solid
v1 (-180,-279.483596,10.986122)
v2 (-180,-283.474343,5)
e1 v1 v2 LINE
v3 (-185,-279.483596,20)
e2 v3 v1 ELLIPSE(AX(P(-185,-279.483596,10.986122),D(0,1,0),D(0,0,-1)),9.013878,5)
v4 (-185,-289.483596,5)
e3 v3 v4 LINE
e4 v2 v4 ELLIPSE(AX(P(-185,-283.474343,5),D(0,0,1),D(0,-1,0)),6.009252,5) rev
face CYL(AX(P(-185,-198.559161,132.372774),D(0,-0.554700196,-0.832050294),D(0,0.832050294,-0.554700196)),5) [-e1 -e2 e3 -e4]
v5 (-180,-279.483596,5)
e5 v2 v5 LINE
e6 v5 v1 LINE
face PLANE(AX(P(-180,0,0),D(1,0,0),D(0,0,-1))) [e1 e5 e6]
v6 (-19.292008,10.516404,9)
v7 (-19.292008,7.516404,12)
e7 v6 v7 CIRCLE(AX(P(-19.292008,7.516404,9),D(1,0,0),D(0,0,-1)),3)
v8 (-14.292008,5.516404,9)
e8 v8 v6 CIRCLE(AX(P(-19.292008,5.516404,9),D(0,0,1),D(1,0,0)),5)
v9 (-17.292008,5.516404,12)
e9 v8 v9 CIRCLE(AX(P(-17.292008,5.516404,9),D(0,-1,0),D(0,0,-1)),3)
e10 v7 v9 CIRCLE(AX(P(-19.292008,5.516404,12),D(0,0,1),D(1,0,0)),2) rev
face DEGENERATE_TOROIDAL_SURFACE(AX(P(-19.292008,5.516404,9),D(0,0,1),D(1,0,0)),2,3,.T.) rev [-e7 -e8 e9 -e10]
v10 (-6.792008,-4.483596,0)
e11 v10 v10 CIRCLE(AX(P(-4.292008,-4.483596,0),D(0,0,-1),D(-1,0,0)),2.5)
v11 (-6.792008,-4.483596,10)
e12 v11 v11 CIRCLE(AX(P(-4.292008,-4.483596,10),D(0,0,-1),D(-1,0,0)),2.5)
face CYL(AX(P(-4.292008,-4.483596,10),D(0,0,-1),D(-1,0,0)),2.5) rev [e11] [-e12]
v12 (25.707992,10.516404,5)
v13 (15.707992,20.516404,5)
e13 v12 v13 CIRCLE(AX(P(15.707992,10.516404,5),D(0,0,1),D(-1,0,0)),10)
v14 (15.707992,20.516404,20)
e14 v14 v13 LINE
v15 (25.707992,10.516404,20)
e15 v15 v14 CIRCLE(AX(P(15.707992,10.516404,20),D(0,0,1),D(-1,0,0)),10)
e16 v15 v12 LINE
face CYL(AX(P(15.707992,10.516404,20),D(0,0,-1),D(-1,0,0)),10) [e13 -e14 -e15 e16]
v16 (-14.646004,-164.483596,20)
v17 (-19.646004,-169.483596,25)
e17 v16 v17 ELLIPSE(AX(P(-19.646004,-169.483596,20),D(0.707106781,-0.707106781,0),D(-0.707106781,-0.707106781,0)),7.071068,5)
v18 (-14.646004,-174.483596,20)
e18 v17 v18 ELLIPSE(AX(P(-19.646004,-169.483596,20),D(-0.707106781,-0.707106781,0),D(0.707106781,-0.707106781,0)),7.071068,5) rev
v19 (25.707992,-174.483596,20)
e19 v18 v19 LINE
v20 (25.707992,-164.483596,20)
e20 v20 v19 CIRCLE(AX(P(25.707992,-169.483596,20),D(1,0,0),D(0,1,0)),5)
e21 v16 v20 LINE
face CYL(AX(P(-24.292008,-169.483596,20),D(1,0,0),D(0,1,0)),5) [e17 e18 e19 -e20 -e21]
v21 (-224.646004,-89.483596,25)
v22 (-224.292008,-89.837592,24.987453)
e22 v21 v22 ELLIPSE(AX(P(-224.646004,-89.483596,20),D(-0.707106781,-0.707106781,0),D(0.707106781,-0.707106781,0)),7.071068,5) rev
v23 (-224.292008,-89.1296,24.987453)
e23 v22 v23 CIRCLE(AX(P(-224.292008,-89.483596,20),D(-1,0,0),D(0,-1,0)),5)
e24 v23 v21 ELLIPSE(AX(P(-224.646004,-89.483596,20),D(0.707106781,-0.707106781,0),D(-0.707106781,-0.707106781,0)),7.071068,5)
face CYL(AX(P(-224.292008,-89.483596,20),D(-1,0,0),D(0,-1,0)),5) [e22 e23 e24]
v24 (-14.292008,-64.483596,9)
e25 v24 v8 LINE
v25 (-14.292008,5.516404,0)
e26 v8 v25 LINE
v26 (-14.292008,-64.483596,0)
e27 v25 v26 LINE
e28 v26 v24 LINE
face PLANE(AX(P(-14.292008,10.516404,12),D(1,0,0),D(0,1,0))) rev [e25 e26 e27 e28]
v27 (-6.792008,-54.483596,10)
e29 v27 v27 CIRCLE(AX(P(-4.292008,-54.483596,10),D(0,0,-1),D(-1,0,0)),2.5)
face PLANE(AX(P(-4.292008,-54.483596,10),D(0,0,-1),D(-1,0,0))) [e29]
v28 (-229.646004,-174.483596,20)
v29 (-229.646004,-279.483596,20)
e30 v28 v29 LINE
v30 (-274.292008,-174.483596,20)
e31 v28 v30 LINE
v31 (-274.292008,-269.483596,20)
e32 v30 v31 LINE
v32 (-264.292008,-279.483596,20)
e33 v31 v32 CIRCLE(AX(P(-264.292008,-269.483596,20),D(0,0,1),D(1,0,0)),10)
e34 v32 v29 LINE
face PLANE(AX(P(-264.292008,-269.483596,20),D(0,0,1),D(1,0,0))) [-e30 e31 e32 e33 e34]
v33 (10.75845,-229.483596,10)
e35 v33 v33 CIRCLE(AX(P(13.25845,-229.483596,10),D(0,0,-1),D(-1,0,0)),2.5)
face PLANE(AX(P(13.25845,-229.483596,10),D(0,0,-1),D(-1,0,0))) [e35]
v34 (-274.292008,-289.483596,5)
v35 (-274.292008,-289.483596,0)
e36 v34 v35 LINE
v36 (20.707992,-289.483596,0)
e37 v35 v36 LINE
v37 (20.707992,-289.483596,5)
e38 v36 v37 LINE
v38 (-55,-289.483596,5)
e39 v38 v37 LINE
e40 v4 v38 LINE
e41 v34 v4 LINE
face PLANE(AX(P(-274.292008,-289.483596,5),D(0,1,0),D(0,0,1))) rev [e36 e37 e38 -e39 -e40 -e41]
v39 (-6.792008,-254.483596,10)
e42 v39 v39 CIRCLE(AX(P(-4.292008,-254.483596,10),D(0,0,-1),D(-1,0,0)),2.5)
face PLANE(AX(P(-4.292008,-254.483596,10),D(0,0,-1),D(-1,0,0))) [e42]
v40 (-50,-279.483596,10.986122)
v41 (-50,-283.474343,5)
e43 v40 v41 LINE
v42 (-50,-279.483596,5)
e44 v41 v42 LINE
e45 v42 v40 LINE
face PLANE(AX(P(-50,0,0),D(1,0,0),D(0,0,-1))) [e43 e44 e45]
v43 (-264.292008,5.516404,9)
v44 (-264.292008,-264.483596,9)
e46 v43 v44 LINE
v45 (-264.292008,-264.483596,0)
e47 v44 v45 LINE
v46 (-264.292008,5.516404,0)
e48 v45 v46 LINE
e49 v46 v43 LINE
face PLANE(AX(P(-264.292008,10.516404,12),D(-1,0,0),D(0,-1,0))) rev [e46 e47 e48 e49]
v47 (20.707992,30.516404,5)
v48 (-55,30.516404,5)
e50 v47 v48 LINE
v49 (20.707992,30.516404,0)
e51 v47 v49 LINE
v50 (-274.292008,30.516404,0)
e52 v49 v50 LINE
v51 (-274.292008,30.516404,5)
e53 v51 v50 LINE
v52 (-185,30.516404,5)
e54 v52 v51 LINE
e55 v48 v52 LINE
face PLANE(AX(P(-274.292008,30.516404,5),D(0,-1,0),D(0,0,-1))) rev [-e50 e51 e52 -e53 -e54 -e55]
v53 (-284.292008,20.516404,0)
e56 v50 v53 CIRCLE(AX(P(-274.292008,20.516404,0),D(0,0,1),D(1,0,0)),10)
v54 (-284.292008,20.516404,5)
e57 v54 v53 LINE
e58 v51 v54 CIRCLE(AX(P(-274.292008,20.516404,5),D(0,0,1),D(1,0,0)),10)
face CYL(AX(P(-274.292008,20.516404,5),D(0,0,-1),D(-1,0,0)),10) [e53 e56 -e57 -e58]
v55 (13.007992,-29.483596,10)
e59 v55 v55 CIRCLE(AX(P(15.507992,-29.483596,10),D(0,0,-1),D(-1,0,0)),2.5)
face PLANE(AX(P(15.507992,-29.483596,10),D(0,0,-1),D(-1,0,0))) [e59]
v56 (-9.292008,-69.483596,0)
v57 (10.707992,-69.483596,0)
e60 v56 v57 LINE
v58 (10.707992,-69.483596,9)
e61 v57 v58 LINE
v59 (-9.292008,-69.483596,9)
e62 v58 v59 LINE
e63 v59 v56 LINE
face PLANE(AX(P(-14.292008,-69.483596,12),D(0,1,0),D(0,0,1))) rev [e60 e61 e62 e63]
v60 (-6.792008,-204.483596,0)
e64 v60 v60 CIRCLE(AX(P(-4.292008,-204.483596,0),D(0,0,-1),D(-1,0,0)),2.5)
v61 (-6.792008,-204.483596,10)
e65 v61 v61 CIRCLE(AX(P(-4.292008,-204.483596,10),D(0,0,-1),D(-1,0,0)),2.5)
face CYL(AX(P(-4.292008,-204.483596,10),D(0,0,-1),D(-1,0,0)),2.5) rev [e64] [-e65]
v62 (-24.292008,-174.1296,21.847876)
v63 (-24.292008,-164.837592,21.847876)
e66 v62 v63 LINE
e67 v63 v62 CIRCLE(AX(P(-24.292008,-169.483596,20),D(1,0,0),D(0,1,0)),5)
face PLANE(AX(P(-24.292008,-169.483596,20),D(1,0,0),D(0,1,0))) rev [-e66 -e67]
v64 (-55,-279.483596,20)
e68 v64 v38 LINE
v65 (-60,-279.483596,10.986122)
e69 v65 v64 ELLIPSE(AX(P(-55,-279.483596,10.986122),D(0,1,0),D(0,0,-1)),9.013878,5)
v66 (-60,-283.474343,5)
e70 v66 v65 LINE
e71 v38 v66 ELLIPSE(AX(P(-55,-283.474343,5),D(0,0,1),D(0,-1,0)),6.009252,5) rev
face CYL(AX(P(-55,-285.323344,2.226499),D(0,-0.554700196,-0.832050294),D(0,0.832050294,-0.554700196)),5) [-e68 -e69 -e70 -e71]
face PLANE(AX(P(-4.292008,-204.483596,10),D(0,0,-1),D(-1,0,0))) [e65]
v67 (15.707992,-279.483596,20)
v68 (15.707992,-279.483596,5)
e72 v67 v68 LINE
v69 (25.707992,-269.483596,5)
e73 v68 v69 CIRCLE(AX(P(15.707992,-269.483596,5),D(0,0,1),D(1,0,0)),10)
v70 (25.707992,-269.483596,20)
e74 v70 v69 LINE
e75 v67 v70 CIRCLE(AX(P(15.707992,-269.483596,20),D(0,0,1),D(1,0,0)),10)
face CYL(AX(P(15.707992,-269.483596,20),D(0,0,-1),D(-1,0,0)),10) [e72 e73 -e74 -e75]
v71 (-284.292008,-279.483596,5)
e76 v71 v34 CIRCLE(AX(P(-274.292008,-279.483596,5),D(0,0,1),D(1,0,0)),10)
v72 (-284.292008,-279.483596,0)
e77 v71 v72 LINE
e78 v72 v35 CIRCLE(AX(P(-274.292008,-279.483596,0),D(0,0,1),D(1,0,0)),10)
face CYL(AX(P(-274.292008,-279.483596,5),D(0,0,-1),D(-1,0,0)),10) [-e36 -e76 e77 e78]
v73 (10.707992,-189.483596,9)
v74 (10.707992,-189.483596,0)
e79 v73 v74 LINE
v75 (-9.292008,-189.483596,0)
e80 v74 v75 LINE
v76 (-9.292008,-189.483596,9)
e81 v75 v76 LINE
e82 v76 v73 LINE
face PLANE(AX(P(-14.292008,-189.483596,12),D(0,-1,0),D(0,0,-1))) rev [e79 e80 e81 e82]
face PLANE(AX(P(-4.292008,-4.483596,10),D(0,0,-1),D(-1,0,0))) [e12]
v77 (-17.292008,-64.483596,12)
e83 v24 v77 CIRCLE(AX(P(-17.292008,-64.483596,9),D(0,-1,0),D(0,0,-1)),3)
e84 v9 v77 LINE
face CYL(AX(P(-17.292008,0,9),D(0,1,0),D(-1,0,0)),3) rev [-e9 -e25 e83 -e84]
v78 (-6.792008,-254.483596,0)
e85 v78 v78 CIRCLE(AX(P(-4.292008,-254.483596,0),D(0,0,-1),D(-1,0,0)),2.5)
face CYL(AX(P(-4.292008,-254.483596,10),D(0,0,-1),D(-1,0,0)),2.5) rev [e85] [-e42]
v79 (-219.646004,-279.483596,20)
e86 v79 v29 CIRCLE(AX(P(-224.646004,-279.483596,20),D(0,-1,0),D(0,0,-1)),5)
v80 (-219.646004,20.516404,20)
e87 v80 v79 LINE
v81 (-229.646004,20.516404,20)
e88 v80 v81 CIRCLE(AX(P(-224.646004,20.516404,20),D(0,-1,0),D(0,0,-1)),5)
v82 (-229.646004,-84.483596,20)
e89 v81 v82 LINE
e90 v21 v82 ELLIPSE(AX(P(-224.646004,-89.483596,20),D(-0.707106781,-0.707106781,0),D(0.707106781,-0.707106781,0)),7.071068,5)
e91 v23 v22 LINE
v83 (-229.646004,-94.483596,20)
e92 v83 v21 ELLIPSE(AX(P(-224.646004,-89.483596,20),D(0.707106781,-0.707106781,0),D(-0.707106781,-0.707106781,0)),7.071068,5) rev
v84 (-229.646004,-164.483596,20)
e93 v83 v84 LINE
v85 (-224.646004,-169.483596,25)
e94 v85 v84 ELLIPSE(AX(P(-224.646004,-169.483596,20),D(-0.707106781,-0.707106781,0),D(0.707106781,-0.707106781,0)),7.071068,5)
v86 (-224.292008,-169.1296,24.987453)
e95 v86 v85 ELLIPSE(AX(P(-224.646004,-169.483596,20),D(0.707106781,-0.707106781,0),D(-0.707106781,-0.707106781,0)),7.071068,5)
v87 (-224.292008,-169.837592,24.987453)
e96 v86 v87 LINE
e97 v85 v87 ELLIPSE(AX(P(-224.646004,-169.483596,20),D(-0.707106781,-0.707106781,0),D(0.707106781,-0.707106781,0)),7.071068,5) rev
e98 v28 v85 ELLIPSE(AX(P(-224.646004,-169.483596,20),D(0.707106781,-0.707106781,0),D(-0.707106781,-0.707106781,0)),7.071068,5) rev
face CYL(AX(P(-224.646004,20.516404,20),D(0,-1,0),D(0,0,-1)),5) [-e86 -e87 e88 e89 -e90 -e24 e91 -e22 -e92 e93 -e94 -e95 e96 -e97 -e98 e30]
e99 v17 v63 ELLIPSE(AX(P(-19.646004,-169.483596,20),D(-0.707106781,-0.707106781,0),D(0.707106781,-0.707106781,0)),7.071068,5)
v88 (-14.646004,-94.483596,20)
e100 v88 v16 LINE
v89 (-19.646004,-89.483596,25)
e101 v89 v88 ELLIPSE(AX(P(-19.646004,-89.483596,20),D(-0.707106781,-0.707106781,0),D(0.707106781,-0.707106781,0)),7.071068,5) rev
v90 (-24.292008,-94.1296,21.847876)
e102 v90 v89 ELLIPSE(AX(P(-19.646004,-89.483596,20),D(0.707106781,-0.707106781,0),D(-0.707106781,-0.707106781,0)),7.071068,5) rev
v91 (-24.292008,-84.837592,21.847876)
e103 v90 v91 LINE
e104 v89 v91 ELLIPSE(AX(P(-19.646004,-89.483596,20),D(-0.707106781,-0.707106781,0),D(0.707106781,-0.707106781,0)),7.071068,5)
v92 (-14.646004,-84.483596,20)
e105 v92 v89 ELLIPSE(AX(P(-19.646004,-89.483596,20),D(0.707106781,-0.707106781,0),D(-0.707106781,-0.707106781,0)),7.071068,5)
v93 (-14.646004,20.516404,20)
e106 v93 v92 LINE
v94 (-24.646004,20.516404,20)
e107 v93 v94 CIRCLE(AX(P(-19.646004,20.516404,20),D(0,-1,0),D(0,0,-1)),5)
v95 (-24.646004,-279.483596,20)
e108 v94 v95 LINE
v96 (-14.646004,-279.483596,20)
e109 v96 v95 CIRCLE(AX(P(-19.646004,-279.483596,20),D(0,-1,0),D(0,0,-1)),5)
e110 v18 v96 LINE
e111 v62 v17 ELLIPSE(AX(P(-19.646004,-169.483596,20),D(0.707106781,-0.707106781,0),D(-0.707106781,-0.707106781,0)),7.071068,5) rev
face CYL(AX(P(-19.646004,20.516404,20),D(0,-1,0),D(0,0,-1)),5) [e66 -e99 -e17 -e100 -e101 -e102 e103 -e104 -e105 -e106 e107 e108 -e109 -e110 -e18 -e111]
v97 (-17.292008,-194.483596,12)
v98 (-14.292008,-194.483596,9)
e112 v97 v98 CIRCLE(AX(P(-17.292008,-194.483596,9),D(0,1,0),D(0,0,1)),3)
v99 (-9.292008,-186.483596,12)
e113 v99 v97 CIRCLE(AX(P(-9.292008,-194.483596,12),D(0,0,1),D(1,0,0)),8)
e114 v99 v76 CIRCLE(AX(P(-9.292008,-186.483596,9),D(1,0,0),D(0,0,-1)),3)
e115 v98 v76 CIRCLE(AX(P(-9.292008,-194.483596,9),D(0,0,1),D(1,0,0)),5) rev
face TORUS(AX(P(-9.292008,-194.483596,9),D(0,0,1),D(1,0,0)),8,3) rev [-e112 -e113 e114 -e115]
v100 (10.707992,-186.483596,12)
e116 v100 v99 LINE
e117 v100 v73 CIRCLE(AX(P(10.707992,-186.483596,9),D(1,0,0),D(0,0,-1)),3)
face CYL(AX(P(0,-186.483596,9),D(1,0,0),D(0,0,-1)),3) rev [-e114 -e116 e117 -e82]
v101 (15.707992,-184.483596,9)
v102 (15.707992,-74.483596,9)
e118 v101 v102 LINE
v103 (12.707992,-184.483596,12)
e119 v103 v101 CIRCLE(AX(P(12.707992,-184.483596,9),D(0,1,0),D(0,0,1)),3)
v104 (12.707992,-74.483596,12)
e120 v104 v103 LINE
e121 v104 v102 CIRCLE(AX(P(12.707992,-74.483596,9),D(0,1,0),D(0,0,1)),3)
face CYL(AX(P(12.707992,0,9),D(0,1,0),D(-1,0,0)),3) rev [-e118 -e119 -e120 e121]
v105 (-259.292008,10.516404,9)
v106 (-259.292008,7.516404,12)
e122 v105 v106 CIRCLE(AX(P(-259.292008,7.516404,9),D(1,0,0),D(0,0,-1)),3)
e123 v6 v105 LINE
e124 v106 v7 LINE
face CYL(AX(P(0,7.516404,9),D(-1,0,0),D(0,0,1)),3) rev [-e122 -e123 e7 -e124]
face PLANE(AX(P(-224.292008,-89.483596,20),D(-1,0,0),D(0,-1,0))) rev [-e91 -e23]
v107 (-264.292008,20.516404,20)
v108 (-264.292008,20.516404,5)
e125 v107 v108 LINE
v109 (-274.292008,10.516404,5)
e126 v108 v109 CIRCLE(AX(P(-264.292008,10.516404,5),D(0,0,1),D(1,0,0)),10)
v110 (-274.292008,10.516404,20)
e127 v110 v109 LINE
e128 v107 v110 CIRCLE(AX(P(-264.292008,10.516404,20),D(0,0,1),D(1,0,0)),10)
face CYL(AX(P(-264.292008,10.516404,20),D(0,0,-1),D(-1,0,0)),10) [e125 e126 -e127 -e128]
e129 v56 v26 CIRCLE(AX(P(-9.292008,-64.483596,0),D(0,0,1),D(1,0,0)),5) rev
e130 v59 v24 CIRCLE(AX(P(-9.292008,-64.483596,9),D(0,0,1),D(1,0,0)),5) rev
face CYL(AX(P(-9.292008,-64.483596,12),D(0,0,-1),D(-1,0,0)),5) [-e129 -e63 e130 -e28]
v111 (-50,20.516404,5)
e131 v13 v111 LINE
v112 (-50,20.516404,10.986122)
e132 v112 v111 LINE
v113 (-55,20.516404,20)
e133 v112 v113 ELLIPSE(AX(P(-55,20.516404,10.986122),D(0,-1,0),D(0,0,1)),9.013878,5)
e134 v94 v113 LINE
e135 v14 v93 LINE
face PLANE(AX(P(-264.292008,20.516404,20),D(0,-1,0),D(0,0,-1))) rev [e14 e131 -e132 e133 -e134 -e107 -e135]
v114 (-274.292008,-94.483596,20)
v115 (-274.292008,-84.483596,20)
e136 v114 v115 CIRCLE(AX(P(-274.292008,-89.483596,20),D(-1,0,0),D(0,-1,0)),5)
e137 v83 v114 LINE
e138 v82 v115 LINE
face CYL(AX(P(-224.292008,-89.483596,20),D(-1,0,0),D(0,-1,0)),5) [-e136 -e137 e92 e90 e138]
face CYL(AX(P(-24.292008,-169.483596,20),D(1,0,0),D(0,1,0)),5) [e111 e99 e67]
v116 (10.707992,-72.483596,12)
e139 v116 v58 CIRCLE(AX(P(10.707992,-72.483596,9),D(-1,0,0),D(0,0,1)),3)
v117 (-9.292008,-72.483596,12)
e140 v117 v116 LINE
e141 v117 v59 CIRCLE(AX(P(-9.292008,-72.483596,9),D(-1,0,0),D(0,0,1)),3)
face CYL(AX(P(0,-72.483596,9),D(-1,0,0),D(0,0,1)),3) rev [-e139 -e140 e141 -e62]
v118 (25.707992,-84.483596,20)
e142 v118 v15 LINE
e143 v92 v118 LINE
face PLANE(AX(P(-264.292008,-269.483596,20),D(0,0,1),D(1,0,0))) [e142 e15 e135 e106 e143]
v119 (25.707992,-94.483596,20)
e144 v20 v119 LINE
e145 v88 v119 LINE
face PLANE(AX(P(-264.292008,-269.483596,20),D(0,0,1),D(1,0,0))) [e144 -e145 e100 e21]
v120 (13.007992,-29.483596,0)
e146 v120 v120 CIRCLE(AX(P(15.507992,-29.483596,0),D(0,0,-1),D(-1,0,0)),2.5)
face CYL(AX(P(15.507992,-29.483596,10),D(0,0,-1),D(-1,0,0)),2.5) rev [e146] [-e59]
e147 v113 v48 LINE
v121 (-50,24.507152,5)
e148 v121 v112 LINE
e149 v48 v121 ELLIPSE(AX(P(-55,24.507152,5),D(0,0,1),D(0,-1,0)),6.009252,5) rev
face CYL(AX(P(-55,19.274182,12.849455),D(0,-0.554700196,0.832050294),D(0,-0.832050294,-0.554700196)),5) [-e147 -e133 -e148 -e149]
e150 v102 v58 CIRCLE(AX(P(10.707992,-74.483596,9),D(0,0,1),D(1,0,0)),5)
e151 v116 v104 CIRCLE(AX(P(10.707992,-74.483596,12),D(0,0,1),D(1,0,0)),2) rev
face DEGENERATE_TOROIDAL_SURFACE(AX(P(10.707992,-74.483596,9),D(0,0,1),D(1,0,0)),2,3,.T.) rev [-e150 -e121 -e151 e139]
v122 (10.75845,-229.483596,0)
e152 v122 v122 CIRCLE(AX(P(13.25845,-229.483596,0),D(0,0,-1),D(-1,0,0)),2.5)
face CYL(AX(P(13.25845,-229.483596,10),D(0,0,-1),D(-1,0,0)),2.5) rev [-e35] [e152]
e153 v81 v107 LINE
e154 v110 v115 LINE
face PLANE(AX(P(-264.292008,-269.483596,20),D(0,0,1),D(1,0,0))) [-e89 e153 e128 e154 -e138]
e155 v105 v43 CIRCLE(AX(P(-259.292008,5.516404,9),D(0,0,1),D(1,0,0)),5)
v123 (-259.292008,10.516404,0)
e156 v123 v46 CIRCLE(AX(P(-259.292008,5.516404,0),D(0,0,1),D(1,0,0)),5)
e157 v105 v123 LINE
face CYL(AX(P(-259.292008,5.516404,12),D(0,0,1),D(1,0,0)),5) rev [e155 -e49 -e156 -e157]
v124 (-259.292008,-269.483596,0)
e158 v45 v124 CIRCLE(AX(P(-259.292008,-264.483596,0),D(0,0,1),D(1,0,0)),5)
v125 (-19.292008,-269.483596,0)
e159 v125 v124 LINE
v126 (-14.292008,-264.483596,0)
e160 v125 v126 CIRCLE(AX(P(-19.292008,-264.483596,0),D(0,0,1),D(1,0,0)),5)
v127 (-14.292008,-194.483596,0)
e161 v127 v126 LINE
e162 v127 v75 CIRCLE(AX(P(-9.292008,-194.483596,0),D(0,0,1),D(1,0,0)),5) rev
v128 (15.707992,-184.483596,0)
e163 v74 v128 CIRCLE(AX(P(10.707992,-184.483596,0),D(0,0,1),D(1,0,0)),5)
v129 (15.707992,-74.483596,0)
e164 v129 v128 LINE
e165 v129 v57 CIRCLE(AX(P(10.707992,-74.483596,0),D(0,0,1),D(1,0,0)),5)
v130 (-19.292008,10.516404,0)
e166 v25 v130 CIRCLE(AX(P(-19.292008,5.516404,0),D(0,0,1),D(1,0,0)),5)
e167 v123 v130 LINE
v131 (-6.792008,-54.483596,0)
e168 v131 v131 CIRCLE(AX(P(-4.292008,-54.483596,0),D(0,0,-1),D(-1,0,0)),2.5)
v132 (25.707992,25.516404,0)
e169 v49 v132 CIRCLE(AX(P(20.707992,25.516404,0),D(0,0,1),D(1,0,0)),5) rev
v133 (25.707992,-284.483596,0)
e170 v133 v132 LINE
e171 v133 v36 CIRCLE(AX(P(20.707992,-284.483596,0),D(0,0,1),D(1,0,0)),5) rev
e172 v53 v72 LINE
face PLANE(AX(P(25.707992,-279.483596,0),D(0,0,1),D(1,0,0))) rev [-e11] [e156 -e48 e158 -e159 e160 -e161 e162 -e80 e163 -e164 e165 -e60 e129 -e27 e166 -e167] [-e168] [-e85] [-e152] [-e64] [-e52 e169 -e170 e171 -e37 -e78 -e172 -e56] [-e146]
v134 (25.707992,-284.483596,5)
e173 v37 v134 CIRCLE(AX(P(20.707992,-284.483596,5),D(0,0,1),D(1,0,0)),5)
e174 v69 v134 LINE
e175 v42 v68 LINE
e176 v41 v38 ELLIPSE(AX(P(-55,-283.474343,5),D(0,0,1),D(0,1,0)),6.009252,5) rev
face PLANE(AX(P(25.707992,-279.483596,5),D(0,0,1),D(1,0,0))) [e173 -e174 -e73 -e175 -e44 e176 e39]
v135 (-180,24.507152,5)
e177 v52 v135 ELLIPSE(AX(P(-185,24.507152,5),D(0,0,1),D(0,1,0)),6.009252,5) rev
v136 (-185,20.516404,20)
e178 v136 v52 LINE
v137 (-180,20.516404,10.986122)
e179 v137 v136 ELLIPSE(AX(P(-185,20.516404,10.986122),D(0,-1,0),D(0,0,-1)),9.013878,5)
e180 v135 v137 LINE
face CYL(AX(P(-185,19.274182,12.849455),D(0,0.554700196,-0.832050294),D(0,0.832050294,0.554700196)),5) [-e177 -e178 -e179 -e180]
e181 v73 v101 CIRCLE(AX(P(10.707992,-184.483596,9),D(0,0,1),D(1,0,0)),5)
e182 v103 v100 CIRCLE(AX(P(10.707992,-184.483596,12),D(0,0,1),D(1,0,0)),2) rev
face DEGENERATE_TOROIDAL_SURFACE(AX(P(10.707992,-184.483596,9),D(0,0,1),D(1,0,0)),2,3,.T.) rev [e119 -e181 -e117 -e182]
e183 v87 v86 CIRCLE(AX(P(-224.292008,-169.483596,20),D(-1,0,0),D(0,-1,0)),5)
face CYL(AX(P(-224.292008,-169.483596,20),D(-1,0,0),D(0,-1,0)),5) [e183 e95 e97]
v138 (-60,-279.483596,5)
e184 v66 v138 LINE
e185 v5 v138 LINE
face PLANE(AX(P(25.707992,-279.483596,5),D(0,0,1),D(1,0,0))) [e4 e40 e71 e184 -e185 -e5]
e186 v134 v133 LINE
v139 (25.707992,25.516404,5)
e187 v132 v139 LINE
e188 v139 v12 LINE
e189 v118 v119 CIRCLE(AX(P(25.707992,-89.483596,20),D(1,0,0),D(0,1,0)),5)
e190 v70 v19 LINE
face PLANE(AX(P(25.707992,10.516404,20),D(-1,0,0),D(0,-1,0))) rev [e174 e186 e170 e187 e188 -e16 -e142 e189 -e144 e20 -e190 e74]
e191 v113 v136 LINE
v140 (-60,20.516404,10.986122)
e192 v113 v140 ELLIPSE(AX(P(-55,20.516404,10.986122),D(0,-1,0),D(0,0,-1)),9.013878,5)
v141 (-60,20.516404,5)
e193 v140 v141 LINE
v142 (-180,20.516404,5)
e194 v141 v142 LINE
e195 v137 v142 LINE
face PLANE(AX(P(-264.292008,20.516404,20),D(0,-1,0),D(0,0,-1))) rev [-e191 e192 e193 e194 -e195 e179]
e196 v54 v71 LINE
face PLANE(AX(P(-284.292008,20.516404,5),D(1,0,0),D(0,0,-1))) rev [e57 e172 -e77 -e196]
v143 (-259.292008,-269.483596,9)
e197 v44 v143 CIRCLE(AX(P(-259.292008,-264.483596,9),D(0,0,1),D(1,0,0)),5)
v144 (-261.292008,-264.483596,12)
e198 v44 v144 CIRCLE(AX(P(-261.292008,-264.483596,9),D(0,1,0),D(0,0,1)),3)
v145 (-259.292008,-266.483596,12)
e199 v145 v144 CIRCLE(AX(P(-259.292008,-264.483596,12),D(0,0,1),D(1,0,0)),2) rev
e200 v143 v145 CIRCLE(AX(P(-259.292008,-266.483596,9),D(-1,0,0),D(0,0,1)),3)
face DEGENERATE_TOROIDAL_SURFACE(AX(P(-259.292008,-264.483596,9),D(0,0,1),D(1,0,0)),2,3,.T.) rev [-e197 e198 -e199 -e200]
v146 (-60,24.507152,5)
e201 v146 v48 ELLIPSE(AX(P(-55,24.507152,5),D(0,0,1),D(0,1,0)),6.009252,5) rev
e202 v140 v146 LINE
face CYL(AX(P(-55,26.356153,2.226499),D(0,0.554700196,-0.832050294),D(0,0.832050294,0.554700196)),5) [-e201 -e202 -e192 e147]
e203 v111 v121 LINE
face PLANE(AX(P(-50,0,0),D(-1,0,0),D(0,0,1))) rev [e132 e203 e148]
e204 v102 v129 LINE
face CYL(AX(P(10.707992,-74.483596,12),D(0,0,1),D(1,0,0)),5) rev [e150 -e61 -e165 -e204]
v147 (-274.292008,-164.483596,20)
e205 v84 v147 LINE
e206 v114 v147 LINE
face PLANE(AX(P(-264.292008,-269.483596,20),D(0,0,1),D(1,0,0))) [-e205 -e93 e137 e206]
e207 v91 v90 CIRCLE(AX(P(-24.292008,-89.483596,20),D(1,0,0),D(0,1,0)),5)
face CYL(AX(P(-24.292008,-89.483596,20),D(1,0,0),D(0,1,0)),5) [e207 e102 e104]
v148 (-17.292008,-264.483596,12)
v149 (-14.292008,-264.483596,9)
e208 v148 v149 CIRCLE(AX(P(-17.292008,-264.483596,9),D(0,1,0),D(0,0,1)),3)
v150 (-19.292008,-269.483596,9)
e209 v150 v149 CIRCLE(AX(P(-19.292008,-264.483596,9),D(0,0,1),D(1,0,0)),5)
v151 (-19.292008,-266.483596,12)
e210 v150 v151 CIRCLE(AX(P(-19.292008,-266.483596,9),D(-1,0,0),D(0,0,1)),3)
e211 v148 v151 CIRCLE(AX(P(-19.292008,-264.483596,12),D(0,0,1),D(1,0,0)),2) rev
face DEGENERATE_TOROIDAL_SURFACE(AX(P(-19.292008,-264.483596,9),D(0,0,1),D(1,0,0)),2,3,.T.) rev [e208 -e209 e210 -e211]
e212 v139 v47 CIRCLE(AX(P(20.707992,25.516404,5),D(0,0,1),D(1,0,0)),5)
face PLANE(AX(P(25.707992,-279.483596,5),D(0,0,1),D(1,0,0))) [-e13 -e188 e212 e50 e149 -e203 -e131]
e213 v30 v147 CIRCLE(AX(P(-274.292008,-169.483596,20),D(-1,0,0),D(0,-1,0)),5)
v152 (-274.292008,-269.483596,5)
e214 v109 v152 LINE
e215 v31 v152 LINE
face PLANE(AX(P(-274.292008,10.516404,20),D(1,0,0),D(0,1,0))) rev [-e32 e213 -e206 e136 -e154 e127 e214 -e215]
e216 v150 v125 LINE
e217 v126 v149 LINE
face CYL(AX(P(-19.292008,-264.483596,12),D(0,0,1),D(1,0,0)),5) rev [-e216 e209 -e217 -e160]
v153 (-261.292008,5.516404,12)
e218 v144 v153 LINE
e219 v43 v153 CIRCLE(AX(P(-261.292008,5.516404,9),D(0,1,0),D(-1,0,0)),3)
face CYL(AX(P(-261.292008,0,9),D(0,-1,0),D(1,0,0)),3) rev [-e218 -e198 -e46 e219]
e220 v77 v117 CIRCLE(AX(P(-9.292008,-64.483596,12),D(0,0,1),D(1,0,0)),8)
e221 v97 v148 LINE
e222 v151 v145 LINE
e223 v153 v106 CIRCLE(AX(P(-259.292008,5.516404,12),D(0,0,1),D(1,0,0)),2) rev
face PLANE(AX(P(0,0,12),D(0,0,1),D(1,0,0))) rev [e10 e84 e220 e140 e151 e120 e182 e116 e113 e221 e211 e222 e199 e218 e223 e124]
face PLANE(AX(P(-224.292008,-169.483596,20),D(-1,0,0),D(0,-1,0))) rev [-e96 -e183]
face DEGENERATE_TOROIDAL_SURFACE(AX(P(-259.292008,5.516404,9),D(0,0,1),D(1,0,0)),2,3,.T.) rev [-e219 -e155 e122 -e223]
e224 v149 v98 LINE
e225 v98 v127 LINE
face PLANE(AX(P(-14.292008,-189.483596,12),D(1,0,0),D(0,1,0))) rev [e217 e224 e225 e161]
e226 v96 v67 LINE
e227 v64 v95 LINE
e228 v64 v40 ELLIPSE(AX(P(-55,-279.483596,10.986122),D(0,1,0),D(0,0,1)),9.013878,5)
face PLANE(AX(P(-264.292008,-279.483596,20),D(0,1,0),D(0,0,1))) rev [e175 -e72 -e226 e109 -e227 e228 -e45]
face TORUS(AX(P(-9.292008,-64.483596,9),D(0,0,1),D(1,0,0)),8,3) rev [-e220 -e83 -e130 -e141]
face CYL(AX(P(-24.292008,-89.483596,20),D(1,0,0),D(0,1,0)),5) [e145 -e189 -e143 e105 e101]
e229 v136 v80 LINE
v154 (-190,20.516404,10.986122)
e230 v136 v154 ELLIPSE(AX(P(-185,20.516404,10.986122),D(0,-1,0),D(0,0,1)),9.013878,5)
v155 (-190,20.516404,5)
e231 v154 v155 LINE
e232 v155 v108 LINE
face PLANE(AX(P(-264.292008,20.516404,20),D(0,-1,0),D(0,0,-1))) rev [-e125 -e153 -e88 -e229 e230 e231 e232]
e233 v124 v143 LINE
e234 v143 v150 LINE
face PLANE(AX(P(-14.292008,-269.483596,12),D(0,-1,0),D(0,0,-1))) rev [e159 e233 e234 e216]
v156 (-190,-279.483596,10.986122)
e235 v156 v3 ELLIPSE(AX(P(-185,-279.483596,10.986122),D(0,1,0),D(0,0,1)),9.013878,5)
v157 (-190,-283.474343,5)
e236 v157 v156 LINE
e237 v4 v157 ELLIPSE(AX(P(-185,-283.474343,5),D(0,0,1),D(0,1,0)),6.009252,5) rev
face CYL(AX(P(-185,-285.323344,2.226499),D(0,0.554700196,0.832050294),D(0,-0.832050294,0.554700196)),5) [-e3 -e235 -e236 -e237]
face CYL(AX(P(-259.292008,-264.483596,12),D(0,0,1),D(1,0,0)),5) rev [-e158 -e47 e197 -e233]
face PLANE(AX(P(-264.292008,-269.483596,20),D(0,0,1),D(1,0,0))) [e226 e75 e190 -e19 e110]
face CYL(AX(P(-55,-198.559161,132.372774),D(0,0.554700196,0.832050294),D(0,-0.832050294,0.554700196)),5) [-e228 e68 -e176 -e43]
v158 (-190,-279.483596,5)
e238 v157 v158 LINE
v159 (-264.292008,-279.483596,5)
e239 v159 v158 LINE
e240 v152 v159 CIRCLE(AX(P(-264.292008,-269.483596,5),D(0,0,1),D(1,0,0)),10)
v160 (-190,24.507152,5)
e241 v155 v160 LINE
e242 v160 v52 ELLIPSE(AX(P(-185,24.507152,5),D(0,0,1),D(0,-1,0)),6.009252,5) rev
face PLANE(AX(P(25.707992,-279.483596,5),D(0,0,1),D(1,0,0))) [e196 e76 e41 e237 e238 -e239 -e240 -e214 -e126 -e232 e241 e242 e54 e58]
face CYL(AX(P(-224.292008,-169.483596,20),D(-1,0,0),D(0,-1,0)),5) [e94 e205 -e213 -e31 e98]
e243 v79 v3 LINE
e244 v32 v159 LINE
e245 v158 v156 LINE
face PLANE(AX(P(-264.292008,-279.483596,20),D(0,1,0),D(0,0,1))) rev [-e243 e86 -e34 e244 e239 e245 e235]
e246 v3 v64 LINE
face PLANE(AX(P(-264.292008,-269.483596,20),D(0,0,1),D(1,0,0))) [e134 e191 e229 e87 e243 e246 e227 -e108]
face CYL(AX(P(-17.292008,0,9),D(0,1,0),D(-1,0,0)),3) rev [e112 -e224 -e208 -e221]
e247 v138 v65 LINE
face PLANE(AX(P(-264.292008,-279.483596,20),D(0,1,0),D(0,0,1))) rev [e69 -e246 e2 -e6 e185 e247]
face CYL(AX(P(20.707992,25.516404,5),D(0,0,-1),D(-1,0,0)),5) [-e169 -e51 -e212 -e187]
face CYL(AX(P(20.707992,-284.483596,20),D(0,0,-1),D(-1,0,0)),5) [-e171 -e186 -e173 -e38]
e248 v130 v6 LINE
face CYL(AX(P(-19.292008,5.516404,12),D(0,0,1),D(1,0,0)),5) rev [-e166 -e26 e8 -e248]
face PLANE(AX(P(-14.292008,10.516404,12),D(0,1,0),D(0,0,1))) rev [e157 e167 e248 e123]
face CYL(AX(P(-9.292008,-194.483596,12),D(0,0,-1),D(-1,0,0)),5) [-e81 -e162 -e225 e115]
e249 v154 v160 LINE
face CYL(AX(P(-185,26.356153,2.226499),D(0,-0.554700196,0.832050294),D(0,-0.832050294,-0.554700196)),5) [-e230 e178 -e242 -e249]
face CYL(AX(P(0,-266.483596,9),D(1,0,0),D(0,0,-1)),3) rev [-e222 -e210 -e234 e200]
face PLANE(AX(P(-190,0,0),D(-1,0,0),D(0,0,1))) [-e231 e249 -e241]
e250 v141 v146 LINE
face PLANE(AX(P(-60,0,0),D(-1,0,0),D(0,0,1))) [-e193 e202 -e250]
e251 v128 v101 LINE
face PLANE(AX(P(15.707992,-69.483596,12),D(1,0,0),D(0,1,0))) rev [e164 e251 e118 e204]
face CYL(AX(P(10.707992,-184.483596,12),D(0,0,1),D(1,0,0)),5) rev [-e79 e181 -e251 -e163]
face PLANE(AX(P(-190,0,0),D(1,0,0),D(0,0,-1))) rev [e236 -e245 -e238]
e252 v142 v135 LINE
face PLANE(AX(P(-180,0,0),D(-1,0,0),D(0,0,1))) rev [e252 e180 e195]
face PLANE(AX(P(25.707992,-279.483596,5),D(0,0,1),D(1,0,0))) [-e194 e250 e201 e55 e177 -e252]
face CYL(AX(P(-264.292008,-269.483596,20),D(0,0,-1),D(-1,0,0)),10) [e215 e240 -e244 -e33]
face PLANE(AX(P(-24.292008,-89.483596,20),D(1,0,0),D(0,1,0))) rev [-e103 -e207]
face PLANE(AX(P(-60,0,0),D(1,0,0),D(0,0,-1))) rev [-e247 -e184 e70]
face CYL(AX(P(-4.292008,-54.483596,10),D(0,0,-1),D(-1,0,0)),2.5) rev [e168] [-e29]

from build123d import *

# Parameters (mm, degrees)
BOSS_EXTRUDE1_DEPTH  = 5
BOSS_EXTRUDE2_DEPTH  = 15
BOSS_EXTRUDE3_DEPTH  = 10
FILLET1_R            = 5
BOSS_EXTRUDE7_DEPTH  = 10
BOSS_EXTRUDE8_DEPTH  = 10
BOSS_EXTRUDE9_DEPTH  = 10
FILLET5_R            = 5
BOSS_EXTRUDE10_DEPTH = 300
BOSS_EXTRUDE12_DEPTH = 50
BOSS_EXTRUDE13_START = -50
BOSS_EXTRUDE13_DEPTH = 50
CUT_EXTRUDE1_DEPTH   = 12
FILLET7_R            = 5
FILLET8_R            = 3
SKETCH17_W           = 10
SKETCH17_H           = 320
CUT_EXTRUDE2_DEPTH   = 10
FILLET9_R            = 5
SKETCH18_R           = 2.5
CUT_EXTRUDE3_DEPTH   = 10


with BuildPart() as part:
    # Sketch1 → Boss-Extrude1 (new body)
    with BuildSketch(Plane.XY):
        with BuildLine():
            Line((-274.292008101, 30.516404424), (25.707991899, 30.516404424))
            ThreePointArc((25.707991899, 30.516404424), (32.779059711, 27.587472236), (35.707991899, 20.516404424))
            Line((35.707991899, 20.516404424), (35.707991899, -279.483595576))
            ThreePointArc((35.707991899, -279.483595576), (32.779059711, -286.554663388), (25.707991899, -289.483595576))
            Line((25.707991899, -289.483595576), (-274.292008101, -289.483595576))
            ThreePointArc((-274.292008101, -289.483595576), (-281.363075913, -286.554663388), (-284.292008101, -279.483595576))
            Line((-284.292008101, -279.483595576), (-284.292008101, 20.516404424))
            ThreePointArc((-284.292008101, 20.516404424), (-281.363075913, 27.587472236), (-274.292008101, 30.516404424))
        make_face()
    extrude(amount=BOSS_EXTRUDE1_DEPTH)

    # Sketch2 → Boss-Extrude2 (add)
    with BuildSketch(Plane.XY.offset(5)):
        with BuildLine():
            Line((-264.292008101, 20.516404424), (15.707991899, 20.516404424))
            ThreePointArc((15.707991899, 20.516404424), (22.779059711, 17.587472236), (25.707991899, 10.516404424))
            Line((25.707991899, 10.516404424), (25.707991899, -269.483595576))
            ThreePointArc((25.707991899, -269.483595576), (22.779059711, -276.554663388), (15.707991899, -279.483595576))
            Line((15.707991899, -279.483595576), (-264.292008101, -279.483595576))
            ThreePointArc((-264.292008101, -279.483595576), (-271.363075913, -276.554663388), (-274.292008101, -269.483595576))
            Line((-274.292008101, -269.483595576), (-274.292008101, 10.516404424))
            ThreePointArc((-274.292008101, 10.516404424), (-271.363075913, 17.587472236), (-264.292008101, 20.516404424))
        make_face()
    extrude(amount=BOSS_EXTRUDE2_DEPTH)

    # Sketch3 → Boss-Extrude3 (add)
    with BuildSketch(Plane(origin=(-60, 0, 0), x_dir=(0, 0, -1), z_dir=(1, 0, 0))):
        Polygon((-20, 20.516404424), (-5, 20.516404424), (-5, 30.516404424), align=None)
    extrude(amount=BOSS_EXTRUDE3_DEPTH)

    # Fillet1
    fillet1_edges = [part.edges().sort_by_distance(p)[0] for p in [
        (-60, 25.516404424, 12.5),
        (-50, 25.516404424, 12.5),
    ]]
    fillet(fillet1_edges, radius=FILLET1_R - 0.0001)  # a hair under: the kernel refuses the full size

    # Sketch4 → Boss-Extrude7 (add)
    with BuildSketch(Plane(origin=(-180, 0, 0), x_dir=(0, 0, -1), z_dir=(1, 0, 0))):
        Polygon((-20, 20.516404424), (-5, 20.516404424), (-5, 30.516404424), align=None)
    extrude(amount=-BOSS_EXTRUDE7_DEPTH)

    # Sketch9 → Boss-Extrude8 (add)
    with BuildSketch(Plane(origin=(-180, 0, 0), x_dir=(0, 0, -1), z_dir=(1, 0, 0))):
        Polygon((-20, -279.483595576), (-5, -279.483595576), (-5, -289.483595576), align=None)
    extrude(amount=-BOSS_EXTRUDE8_DEPTH)

    # Sketch10 → Boss-Extrude9 (add)
    with BuildSketch(Plane(origin=(-60, 0, 0), x_dir=(0, 0, -1), z_dir=(1, 0, 0))):
        Polygon((-20, -279.483595576), (-5, -279.483595576), (-5, -289.483595576), align=None)
    extrude(amount=BOSS_EXTRUDE9_DEPTH)

    # Fillet5
    fillet5_edges = [part.edges().sort_by_distance(p)[0] for p in [
        (-60, -284.483595576, 12.5),
        (-50, -284.483595576, 12.5),
        (-190, 25.516404424, 12.5),
        (-180, 25.516404424, 12.5),
        (-190, -284.483595576, 12.5),
        (-180, -284.483595576, 12.5),
    ]]
    fillet(fillet5_edges, radius=FILLET5_R - 0.0001)  # a hair under: the kernel refuses the full size

    # Sketch12 → Boss-Extrude10 (add)
    with BuildSketch(Plane.XZ.offset(279.483595576)):
        with BuildLine():
            Line((-229.64600405, 20), (-219.64600405, 20))
            ThreePointArc((-219.64600405, 20), (-224.64600405, 25), (-229.64600405, 20))
        make_face()
        with BuildLine():
            Line((-24.64600405, 20), (-14.64600405, 20))
            ThreePointArc((-14.64600405, 20), (-19.64600405, 25), (-24.64600405, 20))
        make_face()
    extrude(amount=-BOSS_EXTRUDE10_DEPTH)

    # Sketch13 → Boss-Extrude12 (add)
    with BuildSketch(Plane.ZY.offset(274.292008101)):
        with BuildLine():
            Line((20, -84.483595576), (20, -94.483595576))
            ThreePointArc((20, -94.483595576), (25, -89.483595576), (20, -84.483595576))
        make_face()
        with BuildLine():
            Line((20, -164.483595576), (20, -174.483595576))
            ThreePointArc((20, -174.483595576), (25, -169.483595576), (20, -164.483595576))
        make_face()
    extrude(amount=-BOSS_EXTRUDE12_DEPTH)

    # Sketch15 → Boss-Extrude13 (add)
    with BuildSketch(Plane(origin=(25.707991899, 0, 0), x_dir=(0, 0, -1), z_dir=(1, 0, 0)).offset(BOSS_EXTRUDE13_START)):
        with BuildLine():
            Line((-20, -84.483595576), (-20, -94.483595576))
            ThreePointArc((-20, -94.483595576), (-25, -89.483595576), (-20, -84.483595576))
        make_face()
        with BuildLine():
            Line((-20, -164.483595576), (-20, -174.483595576))
            ThreePointArc((-20, -174.483595576), (-25, -169.483595576), (-20, -164.483595576))
        make_face()
    extrude(amount=BOSS_EXTRUDE13_DEPTH)

    # Sketch16 → Cut-Extrude1 (cut)
    with BuildSketch(Plane(origin=(0, 0, 0), x_dir=(-1, 0, 0), z_dir=(0, 0, -1))):
        Polygon((14.292008101, 10.516404424), (264.292008101, 10.516404424), (264.292008101, -269.483595576), (14.292008101, -269.483595576), (14.292008101, -189.483595576), (-15.707991899, -189.483595576), (-15.707991899, -69.483595576), (14.292008101, -69.483595576), align=None)
    extrude(amount=-CUT_EXTRUDE1_DEPTH, mode=Mode.SUBTRACT)

    # Fillet7
    fillet7_edges = [part.edges().sort_by_distance(p)[0] for p in [
        (-14.292008101, -69.483595576, 6),
        (-14.292008101, 10.516404424, 6),
        (-264.292008101, 10.516404424, 6),
        (-264.292008101, -269.483595576, 6),
        (-14.292008101, -269.483595576, 6),
        (-14.292008101, -189.483595576, 6),
        (15.707991899, -189.483595576, 6),
        (15.707991899, -69.483595576, 6),
    ]]
    fillet(fillet7_edges, radius=FILLET7_R)

    # Fillet8
    fillet8_edges = [part.edges().sort_by_distance(p)[0] for p in [
        (-264.292008101, -129.483595576, 12),
        (-139.292008101, -269.483595576, 12),
        (-14.292008101, -29.483595576, 12),
        (0.707991899, -69.483595576, 12),
        (15.707991899, -129.483595576, 12),
        (0.707991899, -189.483595576, 12),
        (-14.292008101, -229.483595576, 12),
        (-139.292008101, 10.516404424, 12),
        (-262.827542007, 9.05193833, 12),
        (-15.756474195, 9.05193833, 12),
        (14.243525805, -70.94806167, 12),
        (14.243525805, -188.019129482, 12),
        (-15.756474195, -268.019129482, 12),
        (-262.827542007, -268.019129482, 12),
        (-12.827542007, -190.94806167, 12),
        (-12.827542007, -68.019129482, 12),
    ]]
    fillet(fillet8_edges, radius=FILLET8_R)

    # Sketch17 → Cut-Extrude2 (cut)
    with BuildSketch(Plane(origin=(0, 0, 0), x_dir=(-1, 0, 0), z_dir=(0, 0, -1))):
        with Locations((-30.707991899, -129.483595576)):
            Rectangle(SKETCH17_W, SKETCH17_H)
    extrude(amount=-CUT_EXTRUDE2_DEPTH, mode=Mode.SUBTRACT)

    # Fillet9
    fillet9_edges = [part.edges().sort_by_distance(p)[0] for p in [
        (25.707991899, -289.483595576, 2.5),
        (25.707991899, 30.516404424, 2.5),
    ]]
    fillet(fillet9_edges, radius=FILLET9_R)

    # Sketch18 → Cut-Extrude3 (cut)
    with BuildSketch(Plane(origin=(0, 0, 0), x_dir=(-1, 0, 0), z_dir=(0, 0, -1))):
        with Locations((4.292008101, -4.483595576)):
            Circle(SKETCH18_R)
        with Locations((-15.507991899, -29.483595576)):
            Circle(SKETCH18_R)
        with Locations((4.292008101, -54.483595576)):
            Circle(SKETCH18_R)
        with Locations((4.292008101, -204.483595576)):
            Circle(SKETCH18_R)
        with Locations((-13.25844967, -229.483595576)):
            Circle(SKETCH18_R)
        with Locations((4.292008101, -254.483595576)):
            Circle(SKETCH18_R)
    extrude(amount=-CUT_EXTRUDE3_DEPTH, mode=Mode.SUBTRACT)


solid = part.part
